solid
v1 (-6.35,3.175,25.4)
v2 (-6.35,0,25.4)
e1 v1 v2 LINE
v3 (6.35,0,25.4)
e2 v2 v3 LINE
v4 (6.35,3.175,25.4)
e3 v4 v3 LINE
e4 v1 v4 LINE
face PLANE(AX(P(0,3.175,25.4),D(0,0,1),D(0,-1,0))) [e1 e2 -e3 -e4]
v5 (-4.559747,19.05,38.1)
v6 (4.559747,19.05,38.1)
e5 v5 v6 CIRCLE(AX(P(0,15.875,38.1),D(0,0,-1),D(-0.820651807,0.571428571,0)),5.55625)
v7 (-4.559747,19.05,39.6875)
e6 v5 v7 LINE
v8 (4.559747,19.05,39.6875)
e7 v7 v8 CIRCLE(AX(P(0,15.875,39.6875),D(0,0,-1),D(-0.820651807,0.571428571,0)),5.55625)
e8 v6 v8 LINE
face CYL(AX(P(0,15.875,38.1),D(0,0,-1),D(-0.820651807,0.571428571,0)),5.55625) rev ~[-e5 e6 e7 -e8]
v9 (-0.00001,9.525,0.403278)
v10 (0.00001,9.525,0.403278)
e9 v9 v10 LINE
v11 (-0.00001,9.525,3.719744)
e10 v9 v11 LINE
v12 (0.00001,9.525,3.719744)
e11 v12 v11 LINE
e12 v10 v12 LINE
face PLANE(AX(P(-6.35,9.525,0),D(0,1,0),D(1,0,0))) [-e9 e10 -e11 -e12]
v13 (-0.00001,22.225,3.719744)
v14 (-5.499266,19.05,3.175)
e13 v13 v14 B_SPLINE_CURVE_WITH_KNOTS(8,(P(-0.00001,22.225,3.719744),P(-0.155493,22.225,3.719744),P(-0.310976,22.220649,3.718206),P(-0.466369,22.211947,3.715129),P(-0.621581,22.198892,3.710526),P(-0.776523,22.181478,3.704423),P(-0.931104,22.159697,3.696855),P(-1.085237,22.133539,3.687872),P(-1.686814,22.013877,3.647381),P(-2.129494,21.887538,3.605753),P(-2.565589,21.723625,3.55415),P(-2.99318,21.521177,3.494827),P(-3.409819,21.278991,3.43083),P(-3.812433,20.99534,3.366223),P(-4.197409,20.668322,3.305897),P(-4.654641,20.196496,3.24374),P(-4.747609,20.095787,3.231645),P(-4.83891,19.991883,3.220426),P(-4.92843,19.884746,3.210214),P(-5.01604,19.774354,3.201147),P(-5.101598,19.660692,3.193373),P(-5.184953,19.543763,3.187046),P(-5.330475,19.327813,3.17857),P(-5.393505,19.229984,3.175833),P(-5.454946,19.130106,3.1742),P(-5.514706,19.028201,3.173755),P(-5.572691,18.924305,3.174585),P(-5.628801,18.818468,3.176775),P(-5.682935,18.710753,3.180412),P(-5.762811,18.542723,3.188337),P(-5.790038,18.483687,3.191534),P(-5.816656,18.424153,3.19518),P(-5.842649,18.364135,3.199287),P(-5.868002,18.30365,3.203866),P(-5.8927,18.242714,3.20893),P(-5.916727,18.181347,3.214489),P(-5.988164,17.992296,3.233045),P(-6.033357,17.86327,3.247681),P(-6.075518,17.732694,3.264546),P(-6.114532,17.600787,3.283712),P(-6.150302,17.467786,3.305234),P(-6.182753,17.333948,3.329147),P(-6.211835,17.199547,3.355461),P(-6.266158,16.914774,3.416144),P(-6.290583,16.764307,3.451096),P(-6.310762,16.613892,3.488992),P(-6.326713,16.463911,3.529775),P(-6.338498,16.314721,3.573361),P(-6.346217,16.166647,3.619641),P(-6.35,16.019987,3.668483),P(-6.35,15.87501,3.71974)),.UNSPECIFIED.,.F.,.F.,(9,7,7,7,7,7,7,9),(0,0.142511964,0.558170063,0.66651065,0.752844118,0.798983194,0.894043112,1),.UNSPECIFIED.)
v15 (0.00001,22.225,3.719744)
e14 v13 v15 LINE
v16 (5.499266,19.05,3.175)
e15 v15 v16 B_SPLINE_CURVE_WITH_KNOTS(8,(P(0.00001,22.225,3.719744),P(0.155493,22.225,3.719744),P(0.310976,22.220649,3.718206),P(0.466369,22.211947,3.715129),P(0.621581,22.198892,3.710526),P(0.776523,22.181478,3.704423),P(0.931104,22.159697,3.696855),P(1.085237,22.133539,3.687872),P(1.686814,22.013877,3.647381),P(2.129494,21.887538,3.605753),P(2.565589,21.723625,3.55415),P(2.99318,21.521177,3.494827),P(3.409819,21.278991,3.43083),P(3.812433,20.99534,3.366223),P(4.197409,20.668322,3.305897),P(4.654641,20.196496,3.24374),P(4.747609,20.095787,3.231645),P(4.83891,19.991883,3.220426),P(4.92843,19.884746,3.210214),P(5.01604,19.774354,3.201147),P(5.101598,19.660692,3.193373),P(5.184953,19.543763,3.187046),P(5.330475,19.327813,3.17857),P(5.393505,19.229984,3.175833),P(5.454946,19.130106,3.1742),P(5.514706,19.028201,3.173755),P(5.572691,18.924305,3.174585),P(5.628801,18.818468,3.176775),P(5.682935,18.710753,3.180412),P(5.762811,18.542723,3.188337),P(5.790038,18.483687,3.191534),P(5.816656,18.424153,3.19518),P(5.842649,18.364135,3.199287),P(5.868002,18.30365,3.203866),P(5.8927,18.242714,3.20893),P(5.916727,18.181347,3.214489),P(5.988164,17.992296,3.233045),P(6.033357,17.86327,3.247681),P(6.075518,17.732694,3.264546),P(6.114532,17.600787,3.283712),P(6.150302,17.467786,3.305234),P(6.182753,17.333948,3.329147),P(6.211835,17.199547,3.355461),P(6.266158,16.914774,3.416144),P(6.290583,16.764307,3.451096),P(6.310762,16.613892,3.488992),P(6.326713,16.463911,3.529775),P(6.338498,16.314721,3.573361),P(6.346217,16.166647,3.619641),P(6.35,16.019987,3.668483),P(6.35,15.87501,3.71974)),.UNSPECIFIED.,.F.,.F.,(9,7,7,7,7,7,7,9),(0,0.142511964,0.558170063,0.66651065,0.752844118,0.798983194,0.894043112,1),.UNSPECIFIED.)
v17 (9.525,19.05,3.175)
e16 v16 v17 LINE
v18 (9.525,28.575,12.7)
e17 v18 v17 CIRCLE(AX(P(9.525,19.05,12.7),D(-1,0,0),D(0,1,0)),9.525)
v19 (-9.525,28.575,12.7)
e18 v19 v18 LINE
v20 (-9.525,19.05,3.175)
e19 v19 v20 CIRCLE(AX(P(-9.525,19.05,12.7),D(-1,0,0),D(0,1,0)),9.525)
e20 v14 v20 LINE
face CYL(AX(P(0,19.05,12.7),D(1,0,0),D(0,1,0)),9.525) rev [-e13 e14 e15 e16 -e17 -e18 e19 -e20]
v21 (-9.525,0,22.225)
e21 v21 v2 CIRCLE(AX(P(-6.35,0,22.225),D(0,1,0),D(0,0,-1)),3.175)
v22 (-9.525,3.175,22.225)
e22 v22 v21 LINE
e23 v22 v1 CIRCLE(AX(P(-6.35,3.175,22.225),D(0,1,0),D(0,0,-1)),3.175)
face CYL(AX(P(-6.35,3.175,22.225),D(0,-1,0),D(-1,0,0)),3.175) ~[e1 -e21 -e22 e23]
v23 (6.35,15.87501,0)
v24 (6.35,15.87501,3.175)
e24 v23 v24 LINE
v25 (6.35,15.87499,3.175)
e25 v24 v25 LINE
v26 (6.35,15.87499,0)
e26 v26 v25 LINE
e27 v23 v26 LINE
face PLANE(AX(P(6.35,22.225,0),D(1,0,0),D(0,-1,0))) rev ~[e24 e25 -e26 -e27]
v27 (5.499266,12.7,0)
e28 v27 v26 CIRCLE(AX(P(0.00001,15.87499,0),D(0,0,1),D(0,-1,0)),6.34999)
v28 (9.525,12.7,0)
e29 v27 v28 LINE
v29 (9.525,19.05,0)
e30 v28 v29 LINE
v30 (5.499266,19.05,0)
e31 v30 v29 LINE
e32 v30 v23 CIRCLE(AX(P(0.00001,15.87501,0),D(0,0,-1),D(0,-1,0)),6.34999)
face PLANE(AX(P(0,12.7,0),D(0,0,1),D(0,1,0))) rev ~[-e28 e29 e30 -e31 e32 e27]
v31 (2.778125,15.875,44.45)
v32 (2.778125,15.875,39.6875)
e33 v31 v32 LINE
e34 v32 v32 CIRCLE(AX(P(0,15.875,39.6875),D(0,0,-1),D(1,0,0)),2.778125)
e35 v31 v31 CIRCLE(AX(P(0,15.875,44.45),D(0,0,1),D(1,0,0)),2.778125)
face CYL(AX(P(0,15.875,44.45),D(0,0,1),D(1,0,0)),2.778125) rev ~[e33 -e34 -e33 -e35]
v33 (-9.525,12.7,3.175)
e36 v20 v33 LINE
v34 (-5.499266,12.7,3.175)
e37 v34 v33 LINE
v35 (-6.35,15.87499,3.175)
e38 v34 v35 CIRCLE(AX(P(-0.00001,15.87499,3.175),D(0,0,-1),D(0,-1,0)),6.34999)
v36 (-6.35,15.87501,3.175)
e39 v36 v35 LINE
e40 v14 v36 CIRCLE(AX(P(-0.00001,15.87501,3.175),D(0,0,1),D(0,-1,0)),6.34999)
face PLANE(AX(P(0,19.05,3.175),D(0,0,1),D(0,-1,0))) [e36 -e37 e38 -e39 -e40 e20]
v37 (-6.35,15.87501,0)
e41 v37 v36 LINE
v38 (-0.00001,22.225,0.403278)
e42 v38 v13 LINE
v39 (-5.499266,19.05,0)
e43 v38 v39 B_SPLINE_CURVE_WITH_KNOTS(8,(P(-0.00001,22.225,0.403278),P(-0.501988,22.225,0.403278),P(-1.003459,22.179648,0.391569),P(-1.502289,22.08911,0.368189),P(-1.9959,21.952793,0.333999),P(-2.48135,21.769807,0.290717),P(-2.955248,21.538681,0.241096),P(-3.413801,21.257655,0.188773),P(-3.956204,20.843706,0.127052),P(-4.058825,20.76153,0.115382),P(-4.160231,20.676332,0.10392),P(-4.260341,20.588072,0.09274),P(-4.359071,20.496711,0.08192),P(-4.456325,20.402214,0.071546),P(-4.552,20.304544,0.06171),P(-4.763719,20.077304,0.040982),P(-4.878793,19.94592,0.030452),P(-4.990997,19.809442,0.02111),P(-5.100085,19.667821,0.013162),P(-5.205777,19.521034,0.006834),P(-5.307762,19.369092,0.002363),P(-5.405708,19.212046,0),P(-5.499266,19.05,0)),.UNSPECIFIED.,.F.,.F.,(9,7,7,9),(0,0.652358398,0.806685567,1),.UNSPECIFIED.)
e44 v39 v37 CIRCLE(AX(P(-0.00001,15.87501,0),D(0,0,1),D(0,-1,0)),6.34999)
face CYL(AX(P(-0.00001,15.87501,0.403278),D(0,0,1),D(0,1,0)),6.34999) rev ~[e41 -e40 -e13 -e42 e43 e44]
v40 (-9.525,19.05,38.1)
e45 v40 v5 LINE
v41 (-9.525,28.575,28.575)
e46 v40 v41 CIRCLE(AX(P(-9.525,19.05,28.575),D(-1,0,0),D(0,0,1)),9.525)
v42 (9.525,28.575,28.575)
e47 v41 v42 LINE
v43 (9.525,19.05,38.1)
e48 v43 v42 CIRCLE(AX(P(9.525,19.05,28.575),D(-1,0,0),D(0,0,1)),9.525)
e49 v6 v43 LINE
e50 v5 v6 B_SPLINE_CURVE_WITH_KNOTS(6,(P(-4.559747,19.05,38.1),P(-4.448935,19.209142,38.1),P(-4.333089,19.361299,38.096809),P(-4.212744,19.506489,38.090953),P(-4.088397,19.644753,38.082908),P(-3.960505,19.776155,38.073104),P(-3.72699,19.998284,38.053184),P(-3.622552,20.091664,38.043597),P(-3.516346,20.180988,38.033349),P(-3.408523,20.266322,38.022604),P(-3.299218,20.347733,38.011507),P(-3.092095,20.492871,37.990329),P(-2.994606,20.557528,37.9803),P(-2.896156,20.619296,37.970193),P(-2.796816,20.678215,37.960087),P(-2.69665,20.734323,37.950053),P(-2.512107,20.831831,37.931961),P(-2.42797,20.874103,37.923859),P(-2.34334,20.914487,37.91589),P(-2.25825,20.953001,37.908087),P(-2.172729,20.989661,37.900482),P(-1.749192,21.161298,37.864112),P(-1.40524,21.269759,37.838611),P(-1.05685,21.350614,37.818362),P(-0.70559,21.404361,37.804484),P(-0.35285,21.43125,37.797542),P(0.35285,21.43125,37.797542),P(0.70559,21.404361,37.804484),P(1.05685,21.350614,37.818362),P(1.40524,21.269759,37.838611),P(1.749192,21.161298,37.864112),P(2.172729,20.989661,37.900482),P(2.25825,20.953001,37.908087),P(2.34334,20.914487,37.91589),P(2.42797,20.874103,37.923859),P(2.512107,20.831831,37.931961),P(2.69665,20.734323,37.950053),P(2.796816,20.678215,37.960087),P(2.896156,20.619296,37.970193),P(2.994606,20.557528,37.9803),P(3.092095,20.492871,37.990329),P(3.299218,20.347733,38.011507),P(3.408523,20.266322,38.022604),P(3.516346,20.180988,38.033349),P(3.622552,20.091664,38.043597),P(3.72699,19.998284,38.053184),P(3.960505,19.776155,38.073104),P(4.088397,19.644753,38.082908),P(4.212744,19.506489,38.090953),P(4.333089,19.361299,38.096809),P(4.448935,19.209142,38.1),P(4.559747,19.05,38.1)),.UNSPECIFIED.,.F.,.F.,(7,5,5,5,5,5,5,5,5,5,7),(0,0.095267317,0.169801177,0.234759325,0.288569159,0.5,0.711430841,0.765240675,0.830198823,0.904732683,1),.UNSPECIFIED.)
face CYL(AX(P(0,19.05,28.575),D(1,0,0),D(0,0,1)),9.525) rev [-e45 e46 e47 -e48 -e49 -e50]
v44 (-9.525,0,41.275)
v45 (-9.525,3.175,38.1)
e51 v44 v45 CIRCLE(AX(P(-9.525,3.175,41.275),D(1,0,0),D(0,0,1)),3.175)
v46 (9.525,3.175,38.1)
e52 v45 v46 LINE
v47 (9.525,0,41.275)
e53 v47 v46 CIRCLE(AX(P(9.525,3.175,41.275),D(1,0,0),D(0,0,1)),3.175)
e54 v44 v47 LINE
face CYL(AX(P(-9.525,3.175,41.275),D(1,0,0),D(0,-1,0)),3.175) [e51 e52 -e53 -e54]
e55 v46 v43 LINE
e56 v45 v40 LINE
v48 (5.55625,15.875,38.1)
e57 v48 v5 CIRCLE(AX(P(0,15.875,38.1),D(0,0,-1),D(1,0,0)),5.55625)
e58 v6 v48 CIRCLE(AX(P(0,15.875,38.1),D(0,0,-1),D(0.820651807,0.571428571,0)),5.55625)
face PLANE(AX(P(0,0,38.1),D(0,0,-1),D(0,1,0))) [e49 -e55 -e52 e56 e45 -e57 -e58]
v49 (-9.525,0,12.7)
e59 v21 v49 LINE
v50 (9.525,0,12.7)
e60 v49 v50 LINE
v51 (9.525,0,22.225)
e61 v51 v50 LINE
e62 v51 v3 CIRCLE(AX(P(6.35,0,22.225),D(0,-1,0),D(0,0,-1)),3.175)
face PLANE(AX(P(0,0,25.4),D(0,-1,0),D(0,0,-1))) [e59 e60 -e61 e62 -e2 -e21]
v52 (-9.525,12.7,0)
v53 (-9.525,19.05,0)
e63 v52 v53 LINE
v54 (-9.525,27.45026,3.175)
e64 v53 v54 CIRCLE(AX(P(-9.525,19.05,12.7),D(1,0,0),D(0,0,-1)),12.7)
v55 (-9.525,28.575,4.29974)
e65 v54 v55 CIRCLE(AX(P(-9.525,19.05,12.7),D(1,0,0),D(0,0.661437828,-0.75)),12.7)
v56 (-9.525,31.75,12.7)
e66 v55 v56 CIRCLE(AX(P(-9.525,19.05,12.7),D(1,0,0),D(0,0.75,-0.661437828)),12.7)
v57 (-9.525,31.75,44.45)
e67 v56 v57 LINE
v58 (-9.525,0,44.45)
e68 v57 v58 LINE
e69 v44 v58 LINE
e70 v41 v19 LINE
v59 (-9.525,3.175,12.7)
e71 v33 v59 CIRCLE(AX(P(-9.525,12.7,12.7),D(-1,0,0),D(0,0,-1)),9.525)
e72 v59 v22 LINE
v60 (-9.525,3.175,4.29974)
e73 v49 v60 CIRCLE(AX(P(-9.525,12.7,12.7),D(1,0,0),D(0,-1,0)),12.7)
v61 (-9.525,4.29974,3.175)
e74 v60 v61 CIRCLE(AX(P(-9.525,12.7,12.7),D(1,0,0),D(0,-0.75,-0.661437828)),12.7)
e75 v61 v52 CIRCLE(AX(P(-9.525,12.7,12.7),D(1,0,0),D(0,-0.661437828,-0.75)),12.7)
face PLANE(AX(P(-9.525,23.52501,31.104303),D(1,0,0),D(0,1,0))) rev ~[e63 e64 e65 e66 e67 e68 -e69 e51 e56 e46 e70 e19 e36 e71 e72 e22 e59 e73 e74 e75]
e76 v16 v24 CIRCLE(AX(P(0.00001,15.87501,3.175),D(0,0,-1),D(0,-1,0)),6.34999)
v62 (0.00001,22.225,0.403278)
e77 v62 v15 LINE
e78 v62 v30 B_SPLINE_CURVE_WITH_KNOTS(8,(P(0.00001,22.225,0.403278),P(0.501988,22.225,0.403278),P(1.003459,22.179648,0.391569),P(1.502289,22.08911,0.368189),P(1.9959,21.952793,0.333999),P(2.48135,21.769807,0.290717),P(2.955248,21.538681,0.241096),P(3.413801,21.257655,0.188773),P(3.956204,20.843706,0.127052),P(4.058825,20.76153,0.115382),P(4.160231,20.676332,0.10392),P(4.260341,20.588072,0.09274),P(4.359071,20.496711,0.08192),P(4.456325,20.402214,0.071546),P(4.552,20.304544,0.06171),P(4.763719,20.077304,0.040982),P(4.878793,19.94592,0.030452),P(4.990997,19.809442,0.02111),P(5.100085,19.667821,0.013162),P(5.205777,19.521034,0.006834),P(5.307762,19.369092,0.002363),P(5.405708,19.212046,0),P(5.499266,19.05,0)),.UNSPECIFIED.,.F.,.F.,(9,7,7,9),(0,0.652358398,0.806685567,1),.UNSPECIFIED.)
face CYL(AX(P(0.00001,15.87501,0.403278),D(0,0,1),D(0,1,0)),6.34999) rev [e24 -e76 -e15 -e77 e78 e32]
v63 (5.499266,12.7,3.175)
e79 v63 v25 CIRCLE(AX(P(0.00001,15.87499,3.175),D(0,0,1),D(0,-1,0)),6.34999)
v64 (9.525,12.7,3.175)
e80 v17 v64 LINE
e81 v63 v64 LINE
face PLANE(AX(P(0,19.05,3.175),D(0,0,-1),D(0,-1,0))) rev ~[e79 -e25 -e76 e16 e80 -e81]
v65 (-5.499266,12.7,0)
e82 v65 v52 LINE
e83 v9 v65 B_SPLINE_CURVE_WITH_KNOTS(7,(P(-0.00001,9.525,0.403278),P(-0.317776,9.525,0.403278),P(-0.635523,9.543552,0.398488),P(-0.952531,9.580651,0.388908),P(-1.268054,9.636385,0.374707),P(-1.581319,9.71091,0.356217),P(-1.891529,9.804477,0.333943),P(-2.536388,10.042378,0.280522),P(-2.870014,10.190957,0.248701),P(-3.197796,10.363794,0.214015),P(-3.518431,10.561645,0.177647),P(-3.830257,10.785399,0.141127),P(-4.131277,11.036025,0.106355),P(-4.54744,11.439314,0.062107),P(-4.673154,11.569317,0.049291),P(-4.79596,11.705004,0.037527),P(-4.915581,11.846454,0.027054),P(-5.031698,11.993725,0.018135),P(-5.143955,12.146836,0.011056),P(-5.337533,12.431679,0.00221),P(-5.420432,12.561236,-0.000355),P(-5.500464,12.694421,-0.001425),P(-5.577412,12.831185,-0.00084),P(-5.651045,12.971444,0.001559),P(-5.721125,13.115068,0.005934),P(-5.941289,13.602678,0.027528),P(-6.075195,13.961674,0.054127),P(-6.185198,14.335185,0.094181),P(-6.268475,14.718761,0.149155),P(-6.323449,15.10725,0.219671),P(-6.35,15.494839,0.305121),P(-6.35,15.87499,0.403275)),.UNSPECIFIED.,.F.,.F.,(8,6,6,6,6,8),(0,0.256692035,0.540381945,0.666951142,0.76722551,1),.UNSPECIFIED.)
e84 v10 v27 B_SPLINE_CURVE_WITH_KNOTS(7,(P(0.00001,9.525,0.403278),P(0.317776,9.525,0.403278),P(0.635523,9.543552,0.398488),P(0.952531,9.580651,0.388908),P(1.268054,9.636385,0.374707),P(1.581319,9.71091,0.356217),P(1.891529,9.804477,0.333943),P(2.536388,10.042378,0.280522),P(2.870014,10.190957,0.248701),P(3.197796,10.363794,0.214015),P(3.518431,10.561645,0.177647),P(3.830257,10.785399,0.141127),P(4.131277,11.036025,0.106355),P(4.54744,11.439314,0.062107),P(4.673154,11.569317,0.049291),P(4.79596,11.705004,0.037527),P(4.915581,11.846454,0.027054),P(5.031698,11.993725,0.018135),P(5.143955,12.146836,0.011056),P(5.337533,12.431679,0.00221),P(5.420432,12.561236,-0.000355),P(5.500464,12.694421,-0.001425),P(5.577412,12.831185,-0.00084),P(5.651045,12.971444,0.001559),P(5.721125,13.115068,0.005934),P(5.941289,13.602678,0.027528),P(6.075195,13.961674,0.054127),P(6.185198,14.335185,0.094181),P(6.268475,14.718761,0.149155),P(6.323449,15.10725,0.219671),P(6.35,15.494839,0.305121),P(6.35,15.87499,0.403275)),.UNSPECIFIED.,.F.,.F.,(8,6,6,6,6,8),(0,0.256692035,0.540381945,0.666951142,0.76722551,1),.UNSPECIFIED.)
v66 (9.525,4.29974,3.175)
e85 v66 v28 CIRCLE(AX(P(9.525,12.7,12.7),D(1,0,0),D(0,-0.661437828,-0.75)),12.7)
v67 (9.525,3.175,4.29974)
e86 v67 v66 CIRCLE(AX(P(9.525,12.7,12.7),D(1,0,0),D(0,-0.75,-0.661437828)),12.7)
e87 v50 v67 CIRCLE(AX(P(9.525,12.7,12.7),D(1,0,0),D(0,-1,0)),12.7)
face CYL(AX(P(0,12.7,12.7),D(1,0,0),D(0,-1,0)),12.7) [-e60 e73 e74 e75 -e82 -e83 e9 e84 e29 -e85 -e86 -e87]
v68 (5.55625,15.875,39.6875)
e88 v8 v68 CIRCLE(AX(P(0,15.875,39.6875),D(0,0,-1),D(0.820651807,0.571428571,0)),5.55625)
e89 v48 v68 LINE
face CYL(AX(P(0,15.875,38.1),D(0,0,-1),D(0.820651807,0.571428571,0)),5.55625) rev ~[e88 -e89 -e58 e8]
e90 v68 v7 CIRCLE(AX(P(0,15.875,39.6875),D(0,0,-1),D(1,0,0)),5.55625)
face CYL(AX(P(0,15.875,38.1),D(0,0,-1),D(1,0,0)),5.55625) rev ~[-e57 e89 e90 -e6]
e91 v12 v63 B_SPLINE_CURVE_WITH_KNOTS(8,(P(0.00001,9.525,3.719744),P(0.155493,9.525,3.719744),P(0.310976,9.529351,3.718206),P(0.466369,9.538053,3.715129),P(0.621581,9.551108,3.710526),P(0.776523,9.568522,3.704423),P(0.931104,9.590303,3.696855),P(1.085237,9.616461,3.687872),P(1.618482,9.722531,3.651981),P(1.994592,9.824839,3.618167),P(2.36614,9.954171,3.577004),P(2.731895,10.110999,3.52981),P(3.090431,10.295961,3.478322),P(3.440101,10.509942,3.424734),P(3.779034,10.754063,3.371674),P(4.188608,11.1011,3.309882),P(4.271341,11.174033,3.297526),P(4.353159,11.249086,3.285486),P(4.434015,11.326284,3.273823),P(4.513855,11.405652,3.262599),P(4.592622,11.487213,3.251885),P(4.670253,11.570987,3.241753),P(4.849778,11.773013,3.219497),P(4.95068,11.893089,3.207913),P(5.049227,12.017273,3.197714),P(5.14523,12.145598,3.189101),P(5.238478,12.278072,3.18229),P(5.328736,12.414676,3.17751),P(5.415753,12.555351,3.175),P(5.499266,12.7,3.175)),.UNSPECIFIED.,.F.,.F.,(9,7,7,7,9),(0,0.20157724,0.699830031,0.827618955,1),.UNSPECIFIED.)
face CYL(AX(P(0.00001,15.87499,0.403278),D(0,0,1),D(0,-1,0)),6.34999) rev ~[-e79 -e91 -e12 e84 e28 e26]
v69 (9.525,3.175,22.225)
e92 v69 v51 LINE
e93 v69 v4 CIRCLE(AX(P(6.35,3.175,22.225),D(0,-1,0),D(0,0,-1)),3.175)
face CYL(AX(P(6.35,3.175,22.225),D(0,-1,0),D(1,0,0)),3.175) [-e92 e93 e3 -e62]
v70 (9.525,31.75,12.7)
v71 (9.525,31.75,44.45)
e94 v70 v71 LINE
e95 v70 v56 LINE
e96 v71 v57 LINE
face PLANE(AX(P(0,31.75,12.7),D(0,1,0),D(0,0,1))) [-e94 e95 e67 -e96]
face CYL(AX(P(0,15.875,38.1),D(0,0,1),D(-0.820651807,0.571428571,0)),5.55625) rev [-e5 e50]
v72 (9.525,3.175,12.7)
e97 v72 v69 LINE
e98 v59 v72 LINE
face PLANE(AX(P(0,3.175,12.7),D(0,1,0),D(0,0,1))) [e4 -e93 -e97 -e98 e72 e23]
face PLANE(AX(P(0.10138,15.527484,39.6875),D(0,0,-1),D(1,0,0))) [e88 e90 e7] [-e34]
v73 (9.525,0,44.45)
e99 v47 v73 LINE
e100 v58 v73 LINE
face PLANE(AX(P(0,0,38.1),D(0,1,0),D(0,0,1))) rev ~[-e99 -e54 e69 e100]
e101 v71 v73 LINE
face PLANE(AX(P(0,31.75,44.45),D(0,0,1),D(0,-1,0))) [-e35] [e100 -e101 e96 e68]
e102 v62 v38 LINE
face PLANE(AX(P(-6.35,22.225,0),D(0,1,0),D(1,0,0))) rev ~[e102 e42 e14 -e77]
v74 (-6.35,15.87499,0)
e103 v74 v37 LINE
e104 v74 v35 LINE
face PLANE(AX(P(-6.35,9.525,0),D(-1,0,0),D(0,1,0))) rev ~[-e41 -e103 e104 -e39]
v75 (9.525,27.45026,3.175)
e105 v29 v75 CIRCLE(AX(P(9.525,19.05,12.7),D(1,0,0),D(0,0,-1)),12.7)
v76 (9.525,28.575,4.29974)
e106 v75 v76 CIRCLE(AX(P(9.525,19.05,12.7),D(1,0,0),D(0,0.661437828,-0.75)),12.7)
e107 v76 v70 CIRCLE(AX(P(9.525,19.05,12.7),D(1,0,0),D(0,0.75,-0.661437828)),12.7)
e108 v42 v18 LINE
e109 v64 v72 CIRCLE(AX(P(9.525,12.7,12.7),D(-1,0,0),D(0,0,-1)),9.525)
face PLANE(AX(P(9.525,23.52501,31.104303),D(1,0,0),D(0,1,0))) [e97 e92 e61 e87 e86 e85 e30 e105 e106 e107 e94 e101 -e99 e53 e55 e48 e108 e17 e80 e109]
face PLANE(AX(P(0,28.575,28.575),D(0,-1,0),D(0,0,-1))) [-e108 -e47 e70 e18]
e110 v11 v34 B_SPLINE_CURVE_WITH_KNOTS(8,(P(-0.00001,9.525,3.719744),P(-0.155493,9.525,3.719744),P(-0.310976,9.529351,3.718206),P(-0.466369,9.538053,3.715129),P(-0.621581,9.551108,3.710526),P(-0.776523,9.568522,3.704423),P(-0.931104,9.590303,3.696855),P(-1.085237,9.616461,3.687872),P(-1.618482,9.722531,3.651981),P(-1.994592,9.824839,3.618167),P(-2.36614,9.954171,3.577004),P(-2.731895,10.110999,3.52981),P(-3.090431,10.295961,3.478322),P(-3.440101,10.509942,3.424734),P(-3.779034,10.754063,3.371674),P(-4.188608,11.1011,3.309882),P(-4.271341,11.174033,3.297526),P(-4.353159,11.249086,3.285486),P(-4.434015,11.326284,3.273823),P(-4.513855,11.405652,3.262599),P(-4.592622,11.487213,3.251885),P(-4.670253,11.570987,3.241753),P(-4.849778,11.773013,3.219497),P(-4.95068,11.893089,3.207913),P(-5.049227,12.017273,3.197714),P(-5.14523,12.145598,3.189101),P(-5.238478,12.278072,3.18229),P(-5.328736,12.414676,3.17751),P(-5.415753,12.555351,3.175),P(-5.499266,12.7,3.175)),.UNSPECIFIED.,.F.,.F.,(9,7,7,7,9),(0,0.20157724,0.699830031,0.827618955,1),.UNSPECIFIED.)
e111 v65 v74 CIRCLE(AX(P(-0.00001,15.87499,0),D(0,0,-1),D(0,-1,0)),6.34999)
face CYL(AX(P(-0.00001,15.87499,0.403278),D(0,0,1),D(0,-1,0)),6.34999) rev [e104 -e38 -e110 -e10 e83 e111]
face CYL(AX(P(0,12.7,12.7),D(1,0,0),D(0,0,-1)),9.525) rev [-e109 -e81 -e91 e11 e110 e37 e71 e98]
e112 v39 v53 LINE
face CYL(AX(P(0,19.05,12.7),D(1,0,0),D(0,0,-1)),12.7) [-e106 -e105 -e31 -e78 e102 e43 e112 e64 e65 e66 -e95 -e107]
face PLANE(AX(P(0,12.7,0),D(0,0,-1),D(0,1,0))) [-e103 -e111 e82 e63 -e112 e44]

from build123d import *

# Parameters (mm, degrees)
F0_W     = 3.175
F0_H     = 6.35
F1_DEPTH = 9.525
F2_W     = 12.7
F2_H     = 6.35
F2_H_2   = 3.175
F3_DEPTH = 3.7207438789
F4_R     = 6.34999
F5_R     = 3.175
F6_R     = 2.778125
F7_DEPTH = 6.35
F8_R     = 2.778125
F9_DEPTH = 1.5875


# Not quite as in the source:
# - a fillet or chamfer is up to 0.001 mm smaller than in the source, because OpenCascade refuses the exact size
# - a feature names something its author has since deleted; it is built from what else it names


with BuildPart() as f1:
    # F0 (on Right) → F1 (new body, symmetric)
    with BuildSketch(Plane.YZ):
        with BuildLine():
            Line((31.75, 44.45), (3.175, 44.45))
            Line((3.175, 44.45), (3.175, 38.1))
            Line((3.175, 38.1), (19.05, 38.1))
            Line((19.05, 38.1), (28.575, 38.1))
            Line((28.575, 38.1), (28.575, 28.575))
            Line((28.575, 28.575), (28.575, 12.7))
            Line((28.575, 12.7), (28.575, 4.2997395874))
            ThreePointArc((28.575, 4.2997395874), (30.929762203, 8.2098719395), (31.75, 12.7))
            Line((31.75, 12.7), (31.75, 44.45))
        make_face()
        with Locations((1.5875, 41.275)):
            Rectangle(F0_W, F0_H)
        with BuildLine():
            Line((28.575, 38.1), (19.05, 38.1))
            ThreePointArc((19.05, 38.1), (25.7851920908, 35.3101920908), (28.575, 28.575))
            Line((28.575, 28.575), (28.575, 38.1))
        make_face()
        with BuildLine():
            ThreePointArc((27.4502604126, 3.175), (28.0302561211, 3.7197438789), (28.575, 4.2997395874))
            Line((28.575, 4.2997395874), (28.575, 12.7))
            ThreePointArc((28.575, 12.7), (25.7851920908, 5.9648079092), (19.05, 3.175))
            Line((19.05, 3.175), (27.4502604126, 3.175))
        make_face()
        with BuildLine():
            ThreePointArc((19.05, 0), (23.5401280605, 0.820237797), (27.4502604126, 3.175))
            Line((27.4502604126, 3.175), (19.05, 3.175))
            Line((19.05, 3.175), (12.7, 3.175))
            Line((12.7, 3.175), (4.2997395874, 3.175))
            ThreePointArc((4.2997395874, 3.175), (8.2098719395, 0.820237797), (12.7, 0))
            Line((12.7, 0), (19.05, 0))
        make_face()
        with BuildLine():
            ThreePointArc((12.7, 3.175), (5.9648079092, 5.9648079092), (3.175, 12.7))
            Line((3.175, 12.7), (3.175, 4.2997395874))
            ThreePointArc((3.175, 4.2997395874), (3.7197438789, 3.7197438789), (4.2997395874, 3.175))
            Line((4.2997395874, 3.175), (12.7, 3.175))
        make_face()
        with BuildLine():
            Line((3.175, 25.4), (0, 25.4))
            Line((0, 25.4), (0, 12.7))
            ThreePointArc((0, 12.7), (0.820237797, 8.2098719395), (3.175, 4.2997395874))
            Line((3.175, 4.2997395874), (3.175, 12.7))
            Line((3.175, 12.7), (3.175, 25.4))
        make_face()
    extrude(amount=F1_DEPTH, both=True)

    # F2 (on face) → F3 (cut, through all)
    with BuildSketch(Plane(origin=(0, 0, 0), x_dir=(1, 0, 0), z_dir=(0, 0, -1))):
        with Locations((0, -15.875)):
            Rectangle(F2_W, F2_H)
        with Locations((0, -11.1125)):
            Rectangle(F2_W, F2_H_2)
        with Locations((0, -20.6375)):
            Rectangle(F2_W, F2_H_2)
    extrude(amount=-F3_DEPTH, mode=Mode.SUBTRACT)

    # F4 (radius 6.35 in the source; OpenCascade refuses exactly that, so slightly less here)
    f4_edges = [f1.edges().sort_by_distance(p)[0] for p in [
        (-6.35, 22.225, 2.061511),
        (-6.35, 9.525, 2.061511),
        (6.35, 9.525, 2.061511),
        (6.35, 22.225, 2.061511),
    ]]
    fillet(f4_edges, radius=F4_R)

    # F5
    f5_edges = [f1.edges().sort_by_distance(p)[0] for p in [
        (0, 0, 38.1),
        (9.525, 1.5875, 25.4),
        (-9.525, 1.5875, 25.4),
    ]]
    fillet(f5_edges, radius=F5_R)

    # F6 (on face) → F7 (cut, through all)
    with BuildSketch(Plane.XY.offset(44.45)):
        with Locations((0, 15.875)):
            Circle(F6_R)
    extrude(amount=-F7_DEPTH, mode=Mode.SUBTRACT)

    # F8 (on face) → F9 (cut, symmetric)
    with BuildSketch(Plane(origin=(0, 0, 38.1), x_dir=(1, 0, 0), z_dir=(0, 0, -1))):
        with BuildLine():
            ThreePointArc((4.5597466007, -19.05), (5.3012737202, -17.5388542623), (5.55625, -15.875))
            ThreePointArc((5.55625, -15.875), (-1.6638542623, -10.5737262798), (-4.5597466007, -19.05))
            Line((-4.5597466007, -19.05), (4.5597466007, -19.05))
        make_face()
        with Locations((0, -15.875)):
            Circle(F8_R, mode=Mode.SUBTRACT)
        with BuildLine():
            Line((4.5597466007, -19.05), (-4.5597466007, -19.05))
            ThreePointArc((-4.5597466007, -19.05), (0, -21.43125), (4.5597466007, -19.05))
        make_face()
    extrude(amount=F9_DEPTH, both=True, mode=Mode.SUBTRACT)


solid = f1.part
